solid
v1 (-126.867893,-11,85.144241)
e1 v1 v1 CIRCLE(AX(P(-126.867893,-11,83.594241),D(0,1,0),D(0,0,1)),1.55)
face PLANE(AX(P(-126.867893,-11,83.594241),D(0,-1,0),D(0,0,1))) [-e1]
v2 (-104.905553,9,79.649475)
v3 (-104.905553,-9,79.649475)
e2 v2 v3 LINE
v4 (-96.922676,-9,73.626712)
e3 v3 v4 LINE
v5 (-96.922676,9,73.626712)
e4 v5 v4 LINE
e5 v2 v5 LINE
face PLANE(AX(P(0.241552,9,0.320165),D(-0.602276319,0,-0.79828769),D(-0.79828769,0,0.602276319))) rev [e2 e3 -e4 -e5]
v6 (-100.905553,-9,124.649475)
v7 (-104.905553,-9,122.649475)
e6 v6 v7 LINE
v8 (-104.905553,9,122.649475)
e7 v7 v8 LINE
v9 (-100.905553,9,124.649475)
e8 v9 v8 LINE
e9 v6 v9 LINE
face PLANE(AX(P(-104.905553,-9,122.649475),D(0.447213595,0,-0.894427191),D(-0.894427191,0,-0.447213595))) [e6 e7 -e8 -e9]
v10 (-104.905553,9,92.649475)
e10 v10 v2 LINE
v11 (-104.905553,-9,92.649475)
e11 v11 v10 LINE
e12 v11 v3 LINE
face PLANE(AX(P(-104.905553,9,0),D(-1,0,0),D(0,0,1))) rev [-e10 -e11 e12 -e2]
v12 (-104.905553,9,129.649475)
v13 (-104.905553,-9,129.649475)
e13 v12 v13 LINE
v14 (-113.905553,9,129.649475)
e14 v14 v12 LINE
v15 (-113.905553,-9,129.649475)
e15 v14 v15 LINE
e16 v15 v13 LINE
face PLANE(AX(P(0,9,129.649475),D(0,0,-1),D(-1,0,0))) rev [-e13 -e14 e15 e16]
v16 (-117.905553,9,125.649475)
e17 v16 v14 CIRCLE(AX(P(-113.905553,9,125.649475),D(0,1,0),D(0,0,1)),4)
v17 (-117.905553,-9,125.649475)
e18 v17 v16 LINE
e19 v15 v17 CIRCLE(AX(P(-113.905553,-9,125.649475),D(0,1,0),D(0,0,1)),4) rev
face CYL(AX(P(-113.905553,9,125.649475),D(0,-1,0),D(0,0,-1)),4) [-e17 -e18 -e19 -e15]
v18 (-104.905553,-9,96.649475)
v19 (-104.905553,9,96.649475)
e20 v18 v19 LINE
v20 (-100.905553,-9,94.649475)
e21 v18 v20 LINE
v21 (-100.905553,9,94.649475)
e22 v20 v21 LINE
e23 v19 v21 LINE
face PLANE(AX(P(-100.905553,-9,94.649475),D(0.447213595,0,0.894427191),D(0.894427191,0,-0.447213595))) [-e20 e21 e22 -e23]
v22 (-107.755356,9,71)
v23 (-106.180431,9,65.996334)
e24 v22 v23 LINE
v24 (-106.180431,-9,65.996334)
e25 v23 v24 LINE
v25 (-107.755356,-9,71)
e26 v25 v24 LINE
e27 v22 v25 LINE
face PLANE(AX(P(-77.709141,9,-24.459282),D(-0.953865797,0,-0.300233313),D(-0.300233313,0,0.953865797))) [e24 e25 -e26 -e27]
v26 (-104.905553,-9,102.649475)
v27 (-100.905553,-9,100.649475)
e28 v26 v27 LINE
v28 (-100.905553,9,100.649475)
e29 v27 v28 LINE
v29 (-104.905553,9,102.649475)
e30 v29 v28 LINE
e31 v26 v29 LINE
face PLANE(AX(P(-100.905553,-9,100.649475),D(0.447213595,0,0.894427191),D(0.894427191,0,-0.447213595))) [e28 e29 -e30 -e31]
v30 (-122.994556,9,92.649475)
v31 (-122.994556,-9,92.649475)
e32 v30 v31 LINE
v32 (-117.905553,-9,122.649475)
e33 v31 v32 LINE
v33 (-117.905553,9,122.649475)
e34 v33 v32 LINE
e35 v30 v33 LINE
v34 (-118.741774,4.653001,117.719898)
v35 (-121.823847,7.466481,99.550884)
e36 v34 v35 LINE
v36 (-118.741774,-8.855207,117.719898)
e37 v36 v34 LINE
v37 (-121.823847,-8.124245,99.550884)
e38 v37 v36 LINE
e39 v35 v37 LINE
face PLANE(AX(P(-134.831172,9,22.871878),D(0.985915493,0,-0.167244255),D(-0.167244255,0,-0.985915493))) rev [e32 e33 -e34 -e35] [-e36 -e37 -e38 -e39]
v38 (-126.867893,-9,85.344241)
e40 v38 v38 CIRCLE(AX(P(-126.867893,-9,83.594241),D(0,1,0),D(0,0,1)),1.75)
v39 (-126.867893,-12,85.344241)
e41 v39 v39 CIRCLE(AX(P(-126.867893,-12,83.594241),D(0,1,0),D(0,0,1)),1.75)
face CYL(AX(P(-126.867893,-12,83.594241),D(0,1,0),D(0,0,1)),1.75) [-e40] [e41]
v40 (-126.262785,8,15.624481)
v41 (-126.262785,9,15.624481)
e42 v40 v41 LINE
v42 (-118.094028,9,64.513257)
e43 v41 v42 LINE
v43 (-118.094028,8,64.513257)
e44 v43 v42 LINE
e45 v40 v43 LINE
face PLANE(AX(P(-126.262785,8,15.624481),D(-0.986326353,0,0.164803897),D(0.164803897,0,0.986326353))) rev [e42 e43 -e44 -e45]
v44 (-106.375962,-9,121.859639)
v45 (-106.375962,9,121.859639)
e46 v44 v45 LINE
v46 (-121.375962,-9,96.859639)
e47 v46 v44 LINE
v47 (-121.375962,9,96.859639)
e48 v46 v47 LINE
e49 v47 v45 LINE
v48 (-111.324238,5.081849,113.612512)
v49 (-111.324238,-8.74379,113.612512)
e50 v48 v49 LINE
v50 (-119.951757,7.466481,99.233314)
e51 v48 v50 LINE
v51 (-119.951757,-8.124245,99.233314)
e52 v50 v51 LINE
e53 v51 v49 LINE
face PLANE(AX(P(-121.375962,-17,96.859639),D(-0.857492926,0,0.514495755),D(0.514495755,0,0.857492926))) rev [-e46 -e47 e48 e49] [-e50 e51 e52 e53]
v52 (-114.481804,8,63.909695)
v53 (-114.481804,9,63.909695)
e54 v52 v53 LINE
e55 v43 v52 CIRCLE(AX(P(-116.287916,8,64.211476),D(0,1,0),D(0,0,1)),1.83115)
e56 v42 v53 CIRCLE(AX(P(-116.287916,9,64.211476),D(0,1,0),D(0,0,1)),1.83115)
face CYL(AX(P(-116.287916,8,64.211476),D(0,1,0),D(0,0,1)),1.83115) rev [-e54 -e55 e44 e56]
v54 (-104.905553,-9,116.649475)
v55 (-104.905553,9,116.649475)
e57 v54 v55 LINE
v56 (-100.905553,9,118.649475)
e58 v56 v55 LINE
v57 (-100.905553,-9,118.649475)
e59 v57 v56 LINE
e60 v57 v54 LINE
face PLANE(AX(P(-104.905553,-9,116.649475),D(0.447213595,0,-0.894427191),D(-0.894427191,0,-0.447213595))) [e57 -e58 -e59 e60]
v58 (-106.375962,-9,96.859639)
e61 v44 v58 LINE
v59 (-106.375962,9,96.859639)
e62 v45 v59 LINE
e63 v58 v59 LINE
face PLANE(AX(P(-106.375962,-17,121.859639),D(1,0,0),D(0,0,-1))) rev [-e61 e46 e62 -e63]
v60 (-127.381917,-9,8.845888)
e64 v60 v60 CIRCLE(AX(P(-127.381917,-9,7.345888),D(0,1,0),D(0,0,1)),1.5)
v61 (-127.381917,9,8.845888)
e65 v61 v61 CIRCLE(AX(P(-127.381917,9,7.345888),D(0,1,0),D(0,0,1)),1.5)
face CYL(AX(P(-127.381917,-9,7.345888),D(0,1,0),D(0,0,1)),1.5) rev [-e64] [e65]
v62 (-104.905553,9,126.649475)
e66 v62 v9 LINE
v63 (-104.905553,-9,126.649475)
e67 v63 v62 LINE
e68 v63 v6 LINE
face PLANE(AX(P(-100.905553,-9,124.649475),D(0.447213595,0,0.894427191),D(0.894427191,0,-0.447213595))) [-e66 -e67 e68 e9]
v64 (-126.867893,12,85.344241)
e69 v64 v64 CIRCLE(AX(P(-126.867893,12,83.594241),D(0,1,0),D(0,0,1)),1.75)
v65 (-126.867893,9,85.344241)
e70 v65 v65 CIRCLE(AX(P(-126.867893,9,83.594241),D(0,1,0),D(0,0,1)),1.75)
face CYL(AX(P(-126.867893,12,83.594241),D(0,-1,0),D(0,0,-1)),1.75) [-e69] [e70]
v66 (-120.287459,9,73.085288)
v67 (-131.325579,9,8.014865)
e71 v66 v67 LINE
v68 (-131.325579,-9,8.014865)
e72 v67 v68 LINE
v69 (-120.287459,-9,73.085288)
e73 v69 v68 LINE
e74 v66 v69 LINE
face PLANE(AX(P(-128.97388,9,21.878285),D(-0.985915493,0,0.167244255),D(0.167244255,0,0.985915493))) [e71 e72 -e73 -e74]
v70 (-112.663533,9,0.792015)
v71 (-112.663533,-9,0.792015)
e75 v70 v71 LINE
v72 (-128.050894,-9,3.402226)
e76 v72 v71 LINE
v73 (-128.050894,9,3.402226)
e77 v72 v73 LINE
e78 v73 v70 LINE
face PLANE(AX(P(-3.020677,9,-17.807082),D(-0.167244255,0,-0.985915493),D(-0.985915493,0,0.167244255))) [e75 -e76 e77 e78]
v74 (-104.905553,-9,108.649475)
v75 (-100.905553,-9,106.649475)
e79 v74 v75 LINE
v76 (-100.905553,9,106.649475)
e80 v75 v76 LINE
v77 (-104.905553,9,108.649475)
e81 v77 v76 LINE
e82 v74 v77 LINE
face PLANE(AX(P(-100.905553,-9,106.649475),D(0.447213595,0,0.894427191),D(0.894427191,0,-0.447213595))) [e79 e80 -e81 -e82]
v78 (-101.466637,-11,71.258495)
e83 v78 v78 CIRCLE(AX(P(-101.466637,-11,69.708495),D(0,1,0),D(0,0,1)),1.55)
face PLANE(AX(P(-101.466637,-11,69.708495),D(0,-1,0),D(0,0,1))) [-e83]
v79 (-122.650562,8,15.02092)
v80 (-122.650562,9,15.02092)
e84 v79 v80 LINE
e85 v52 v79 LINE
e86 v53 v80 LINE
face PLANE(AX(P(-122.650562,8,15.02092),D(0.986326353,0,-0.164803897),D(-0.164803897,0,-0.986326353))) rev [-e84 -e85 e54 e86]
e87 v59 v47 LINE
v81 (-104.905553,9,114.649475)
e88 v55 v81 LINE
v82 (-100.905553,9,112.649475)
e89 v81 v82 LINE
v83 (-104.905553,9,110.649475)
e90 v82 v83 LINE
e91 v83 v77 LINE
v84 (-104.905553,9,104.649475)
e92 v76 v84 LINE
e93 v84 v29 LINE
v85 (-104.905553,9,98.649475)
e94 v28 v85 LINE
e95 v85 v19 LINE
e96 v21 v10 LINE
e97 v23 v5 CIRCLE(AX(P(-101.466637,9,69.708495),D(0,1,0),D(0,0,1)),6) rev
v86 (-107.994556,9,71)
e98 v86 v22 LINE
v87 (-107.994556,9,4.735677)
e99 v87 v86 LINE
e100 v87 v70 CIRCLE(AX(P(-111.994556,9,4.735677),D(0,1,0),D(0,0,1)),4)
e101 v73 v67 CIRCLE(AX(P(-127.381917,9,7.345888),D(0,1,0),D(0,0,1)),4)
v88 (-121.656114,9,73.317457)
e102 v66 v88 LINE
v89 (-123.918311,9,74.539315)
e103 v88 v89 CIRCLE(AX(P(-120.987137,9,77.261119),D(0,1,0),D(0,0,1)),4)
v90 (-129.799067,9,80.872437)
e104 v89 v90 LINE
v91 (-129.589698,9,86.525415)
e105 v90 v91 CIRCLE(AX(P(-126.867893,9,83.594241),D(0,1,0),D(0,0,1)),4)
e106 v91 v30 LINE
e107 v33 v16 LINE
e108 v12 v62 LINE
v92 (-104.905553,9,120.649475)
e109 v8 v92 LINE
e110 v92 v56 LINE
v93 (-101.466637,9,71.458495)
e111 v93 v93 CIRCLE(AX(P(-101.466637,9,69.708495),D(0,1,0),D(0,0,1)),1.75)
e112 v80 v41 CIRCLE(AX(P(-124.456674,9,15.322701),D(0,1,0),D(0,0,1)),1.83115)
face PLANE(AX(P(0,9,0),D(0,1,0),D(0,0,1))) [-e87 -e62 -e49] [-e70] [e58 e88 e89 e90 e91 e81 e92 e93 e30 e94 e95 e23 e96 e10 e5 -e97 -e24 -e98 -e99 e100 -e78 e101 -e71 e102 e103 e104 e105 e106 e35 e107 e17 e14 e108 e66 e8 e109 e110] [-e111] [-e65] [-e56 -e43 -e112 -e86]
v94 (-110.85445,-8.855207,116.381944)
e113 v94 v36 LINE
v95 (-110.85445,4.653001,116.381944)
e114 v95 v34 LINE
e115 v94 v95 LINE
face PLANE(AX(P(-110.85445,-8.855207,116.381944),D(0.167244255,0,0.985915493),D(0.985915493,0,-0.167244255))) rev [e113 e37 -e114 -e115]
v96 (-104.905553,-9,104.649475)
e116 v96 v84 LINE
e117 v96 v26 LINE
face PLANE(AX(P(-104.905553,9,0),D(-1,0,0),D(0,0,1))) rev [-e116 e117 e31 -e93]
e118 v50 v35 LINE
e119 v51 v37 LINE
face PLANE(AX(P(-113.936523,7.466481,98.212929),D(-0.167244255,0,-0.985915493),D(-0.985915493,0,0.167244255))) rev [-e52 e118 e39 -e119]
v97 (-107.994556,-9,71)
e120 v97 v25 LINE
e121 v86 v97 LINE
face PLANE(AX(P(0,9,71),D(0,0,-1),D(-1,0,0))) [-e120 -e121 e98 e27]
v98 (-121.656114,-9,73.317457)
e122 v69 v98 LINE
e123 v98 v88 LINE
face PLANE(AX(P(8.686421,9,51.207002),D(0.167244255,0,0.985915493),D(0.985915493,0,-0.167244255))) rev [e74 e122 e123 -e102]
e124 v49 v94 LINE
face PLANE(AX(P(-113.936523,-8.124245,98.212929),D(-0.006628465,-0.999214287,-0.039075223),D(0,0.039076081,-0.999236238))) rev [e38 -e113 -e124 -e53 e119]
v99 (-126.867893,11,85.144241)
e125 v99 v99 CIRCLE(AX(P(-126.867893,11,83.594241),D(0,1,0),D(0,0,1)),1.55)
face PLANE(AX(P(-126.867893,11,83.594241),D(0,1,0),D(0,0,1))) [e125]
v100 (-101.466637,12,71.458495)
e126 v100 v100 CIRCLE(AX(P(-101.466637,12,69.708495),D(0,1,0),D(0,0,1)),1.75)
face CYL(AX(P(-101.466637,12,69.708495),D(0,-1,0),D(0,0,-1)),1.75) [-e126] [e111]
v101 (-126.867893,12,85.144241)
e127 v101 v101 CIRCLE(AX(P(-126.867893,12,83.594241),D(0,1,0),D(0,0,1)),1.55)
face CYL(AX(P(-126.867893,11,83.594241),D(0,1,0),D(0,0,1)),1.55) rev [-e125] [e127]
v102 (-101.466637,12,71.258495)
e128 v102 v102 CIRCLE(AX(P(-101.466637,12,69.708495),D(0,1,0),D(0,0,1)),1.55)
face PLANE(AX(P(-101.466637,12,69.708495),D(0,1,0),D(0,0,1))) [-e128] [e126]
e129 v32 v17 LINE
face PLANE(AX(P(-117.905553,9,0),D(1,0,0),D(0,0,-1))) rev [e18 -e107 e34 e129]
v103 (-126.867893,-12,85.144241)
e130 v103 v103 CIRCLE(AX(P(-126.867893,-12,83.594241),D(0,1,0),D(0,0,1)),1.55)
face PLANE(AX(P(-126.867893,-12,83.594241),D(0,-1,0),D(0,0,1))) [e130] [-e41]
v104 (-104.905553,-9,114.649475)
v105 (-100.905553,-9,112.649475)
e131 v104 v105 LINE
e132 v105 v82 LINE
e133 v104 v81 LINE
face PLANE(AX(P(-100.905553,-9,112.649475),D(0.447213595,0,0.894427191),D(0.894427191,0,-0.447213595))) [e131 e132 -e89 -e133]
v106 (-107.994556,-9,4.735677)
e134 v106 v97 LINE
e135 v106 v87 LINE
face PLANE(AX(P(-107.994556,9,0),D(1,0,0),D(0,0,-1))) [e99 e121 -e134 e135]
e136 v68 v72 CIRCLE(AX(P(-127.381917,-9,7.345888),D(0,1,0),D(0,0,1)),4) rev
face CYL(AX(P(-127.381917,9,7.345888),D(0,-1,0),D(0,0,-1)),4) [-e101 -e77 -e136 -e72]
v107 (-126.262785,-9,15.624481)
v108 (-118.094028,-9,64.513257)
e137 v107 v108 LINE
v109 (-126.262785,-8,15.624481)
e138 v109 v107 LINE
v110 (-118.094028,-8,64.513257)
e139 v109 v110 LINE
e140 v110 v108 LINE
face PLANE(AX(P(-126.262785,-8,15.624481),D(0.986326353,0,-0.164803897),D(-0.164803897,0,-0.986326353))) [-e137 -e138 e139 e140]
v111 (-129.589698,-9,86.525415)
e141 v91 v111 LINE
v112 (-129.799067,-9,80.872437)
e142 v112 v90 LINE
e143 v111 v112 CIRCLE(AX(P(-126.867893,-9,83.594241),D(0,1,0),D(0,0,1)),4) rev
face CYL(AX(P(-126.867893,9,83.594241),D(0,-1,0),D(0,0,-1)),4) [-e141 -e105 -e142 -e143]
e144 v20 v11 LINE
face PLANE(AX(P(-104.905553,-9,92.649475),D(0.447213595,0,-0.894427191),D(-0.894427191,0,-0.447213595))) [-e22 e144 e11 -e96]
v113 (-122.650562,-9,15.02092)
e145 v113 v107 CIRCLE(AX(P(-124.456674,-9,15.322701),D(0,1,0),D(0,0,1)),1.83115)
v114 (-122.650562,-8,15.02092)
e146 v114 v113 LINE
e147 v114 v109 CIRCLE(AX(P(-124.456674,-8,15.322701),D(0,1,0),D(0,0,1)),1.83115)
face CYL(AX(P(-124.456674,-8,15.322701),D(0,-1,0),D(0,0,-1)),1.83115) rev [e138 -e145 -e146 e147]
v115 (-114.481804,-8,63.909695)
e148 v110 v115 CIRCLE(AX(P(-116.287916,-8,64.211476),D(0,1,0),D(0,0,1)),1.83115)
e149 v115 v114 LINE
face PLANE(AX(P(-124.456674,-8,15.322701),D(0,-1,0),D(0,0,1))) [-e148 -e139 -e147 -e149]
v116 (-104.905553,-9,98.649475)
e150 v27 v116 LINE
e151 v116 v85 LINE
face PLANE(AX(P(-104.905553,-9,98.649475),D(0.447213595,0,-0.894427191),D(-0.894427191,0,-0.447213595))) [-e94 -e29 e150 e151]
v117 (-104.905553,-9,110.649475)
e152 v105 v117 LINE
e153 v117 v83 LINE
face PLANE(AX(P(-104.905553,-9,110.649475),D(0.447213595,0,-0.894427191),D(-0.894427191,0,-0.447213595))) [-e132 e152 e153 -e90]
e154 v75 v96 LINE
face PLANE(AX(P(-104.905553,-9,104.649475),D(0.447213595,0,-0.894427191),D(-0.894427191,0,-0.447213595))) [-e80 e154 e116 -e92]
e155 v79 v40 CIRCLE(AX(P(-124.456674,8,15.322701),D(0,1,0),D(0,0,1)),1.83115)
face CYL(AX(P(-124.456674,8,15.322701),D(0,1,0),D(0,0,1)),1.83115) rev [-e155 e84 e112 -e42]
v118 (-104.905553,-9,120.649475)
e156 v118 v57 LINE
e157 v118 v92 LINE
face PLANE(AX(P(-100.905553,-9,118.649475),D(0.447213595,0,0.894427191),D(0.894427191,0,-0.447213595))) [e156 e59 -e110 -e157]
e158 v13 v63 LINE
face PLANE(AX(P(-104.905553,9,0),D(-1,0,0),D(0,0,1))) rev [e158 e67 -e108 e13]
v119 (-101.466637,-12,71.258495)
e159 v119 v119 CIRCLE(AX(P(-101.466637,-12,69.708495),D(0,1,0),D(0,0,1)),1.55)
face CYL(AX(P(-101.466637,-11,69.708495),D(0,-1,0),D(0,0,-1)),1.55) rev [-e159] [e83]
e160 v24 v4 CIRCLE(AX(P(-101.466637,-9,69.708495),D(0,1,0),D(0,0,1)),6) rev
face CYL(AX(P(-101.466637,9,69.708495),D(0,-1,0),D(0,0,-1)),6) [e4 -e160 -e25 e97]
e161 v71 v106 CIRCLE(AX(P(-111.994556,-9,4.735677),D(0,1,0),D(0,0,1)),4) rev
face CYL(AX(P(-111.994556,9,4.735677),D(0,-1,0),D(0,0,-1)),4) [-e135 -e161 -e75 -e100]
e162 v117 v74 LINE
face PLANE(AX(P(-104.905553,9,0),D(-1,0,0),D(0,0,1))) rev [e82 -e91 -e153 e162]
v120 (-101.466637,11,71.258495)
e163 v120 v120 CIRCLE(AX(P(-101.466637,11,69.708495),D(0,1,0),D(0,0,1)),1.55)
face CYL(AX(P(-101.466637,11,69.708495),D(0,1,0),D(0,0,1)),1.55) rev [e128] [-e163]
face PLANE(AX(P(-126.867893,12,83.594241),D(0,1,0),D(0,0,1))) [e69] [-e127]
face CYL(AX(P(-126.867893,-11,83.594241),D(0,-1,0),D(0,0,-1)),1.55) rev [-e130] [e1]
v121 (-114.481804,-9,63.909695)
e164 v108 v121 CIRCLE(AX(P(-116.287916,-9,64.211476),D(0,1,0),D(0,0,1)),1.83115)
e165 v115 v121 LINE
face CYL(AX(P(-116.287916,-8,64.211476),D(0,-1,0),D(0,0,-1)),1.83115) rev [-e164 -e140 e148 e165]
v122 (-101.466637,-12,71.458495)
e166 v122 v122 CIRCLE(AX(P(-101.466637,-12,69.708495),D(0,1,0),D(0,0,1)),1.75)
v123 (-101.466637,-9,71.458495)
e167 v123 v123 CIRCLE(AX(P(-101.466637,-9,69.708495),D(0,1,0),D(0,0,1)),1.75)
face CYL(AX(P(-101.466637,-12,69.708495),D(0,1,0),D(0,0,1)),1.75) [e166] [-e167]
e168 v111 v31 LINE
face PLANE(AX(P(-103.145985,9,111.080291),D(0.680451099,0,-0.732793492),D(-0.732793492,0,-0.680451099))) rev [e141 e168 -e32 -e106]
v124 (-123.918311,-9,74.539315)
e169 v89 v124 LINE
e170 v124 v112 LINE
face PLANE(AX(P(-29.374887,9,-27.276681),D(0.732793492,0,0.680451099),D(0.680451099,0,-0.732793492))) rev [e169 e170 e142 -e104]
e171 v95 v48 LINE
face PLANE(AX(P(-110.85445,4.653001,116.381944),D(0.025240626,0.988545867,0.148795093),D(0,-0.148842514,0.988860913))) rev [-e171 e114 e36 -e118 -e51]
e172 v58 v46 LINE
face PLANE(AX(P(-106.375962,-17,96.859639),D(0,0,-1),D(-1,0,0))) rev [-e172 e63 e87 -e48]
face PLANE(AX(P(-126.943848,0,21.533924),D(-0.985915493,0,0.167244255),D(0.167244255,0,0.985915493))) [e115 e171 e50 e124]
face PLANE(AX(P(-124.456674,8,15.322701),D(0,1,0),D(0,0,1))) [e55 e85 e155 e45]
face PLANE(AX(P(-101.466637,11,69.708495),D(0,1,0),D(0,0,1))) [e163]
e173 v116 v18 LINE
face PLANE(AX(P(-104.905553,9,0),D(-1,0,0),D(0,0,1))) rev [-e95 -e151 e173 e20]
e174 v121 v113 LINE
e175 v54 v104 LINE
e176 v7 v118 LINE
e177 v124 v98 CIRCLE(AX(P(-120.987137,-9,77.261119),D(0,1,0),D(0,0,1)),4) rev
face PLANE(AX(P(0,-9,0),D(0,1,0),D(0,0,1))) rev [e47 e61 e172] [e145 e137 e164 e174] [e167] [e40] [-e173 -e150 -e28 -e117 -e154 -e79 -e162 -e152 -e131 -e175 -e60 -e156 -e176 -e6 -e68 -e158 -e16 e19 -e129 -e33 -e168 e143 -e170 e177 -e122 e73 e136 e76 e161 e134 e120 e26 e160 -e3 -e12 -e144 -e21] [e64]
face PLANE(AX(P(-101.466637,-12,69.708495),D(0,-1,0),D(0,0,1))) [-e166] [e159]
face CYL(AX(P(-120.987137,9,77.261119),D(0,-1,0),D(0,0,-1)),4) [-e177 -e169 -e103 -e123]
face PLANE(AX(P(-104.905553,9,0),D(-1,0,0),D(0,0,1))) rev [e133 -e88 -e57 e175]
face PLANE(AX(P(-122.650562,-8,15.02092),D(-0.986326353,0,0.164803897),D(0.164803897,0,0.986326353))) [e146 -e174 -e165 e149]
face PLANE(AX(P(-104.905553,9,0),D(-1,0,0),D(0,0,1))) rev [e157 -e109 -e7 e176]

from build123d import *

# Parameters (mm, degrees)
BOSS_EXTRUDE2_DEPTH   = 9
FILLET3_R             = 4
FILLET4_R             = 4
FILLET5_R             = 4
BOSS_EXTRUDE3_DEPTH   = 18
LPATTERN1_COUNT       = 6
LPATTERN1_PITCH       = 6
MIRROR1_START         = -8.124245185
MIRROR1_OUTLINE_R     = 1.5
MIRROR1_DEPTH         = 12.777246129
MIRROR1_START_2       = -9
MIRROR1_2_OUTLINE_R   = 1.5
MIRROR1_2_DEPTH       = 18
MIRROR1_3_DEPTH       = 1
MIRROR1_START_3       = 8
MIRROR1_4_DEPTH       = 1
MIRROR1_START_4       = -11
MIRROR1_5_OUTLINE_R   = 1.75
MIRROR1_5_DEPTH       = 22
MIRROR1_START_5       = -12
MIRROR1_6_OUTLINE_R   = 1.75
MIRROR1_6_OUTLINE_R_2 = 1.55
MIRROR1_6_DEPTH       = 24
MIRROR1_START_6       = -136.757331166
MIRROR1_7_DEPTH       = 7.999999999


with BuildPart() as part:
    # Sketch2 → Boss-Extrude2 (new, symmetric)
    with BuildSketch(Plane(origin=(0, 0, 0), x_dir=(1, 0, 0), z_dir=(0, 1, 0))):
        Polygon((-131.994556455, -4.071203001), (-120.287458623, -73.085287508), (-107.994556455, -71), (-107.994556455, 0), align=None)
        with BuildLine():
            ThreePointArc((-106.180430892, -65.996333846), (-97.650502603, -65.078471315), (-96.922675808, -73.626711859))
            Line((-96.922675808, -73.626711859), (-104.905552704, -79.64947505))
            Line((-104.905552704, -79.64947505), (-104.905552704, -129.64947505))
            Line((-104.905552704, -129.64947505), (-117.905552704, -129.64947505))
            Line((-117.905552704, -129.64947505), (-117.905552704, -122.64947505))
            Line((-117.905552704, -122.64947505), (-122.994556455, -92.64947505))
            Line((-122.994556455, -92.64947505), (-132.520871847, -83.803610759))
            Line((-132.520871847, -83.803610759), (-122.994556455, -73.544501876))
            Line((-122.994556455, -73.544501876), (-107.994556455, -71))
            Line((-107.994556455, -71), (-107.755356075, -71))
            Line((-107.755356075, -71), (-106.180430892, -65.996333846))
        make_face()
    extrude(amount=BOSS_EXTRUDE2_DEPTH, both=True)

    # Fillet3
    fillet3_edges = [part.edges().sort_by_distance(p)[0] for p in [
        (-131.994556455, 0, 4.071203001),
        (-107.994556455, 0, 0),
    ]]
    fillet(fillet3_edges, radius=FILLET3_R)

    # Fillet4
    fillet4_edges = [part.edges().sort_by_distance(p)[0] for p in [
        (-132.520871847, 0, 83.803610759),
        (-122.994556455, 0, 73.544501876),
    ]]
    fillet(fillet4_edges, radius=FILLET4_R)

    # Fillet5
    fillet5_edges = [part.edges().sort_by_distance(p)[0] for p in [
        (-117.905552704, 0, 129.64947505),
    ]]
    fillet(fillet5_edges, radius=FILLET5_R)

    # Sketch4 → Boss-Extrude3 (add)
    with BuildSketch(Plane(origin=(0, 9, 0), x_dir=(1, 0, 0), z_dir=(0, 1, 0))):
        Polygon((-104.905552704, -126.64947505), (-104.905552704, -122.64947505), (-100.905552704, -124.64947505), align=None)
    boss_extrude3 = extrude(amount=-BOSS_EXTRUDE3_DEPTH)

    # LPattern1: Boss-Extrude3 ×6
    with Locations(*[(0, 0, -i * LPATTERN1_PITCH) for i in range(1, LPATTERN1_COUNT)]):
        add(boss_extrude3)

    # Mirror1: read off the stored shape, not the designer's step
    # Mirror1 outline → Mirror1 (cut)
    with BuildSketch(Plane(origin=(0, 0, 0), x_dir=(1, 0, 0), z_dir=(0, 1, 0)).offset(MIRROR1_START)):
        Polygon((-106.375961974, -96.859639276), (-121.375961974, -96.859639276), (-119.951756879, -99.233314435), (-121.823846672, -99.550883501), (-118.741773978, -117.719897586), (-110.854450034, -116.381943548), (-111.324238264, -113.612512127), (-106.375961974, -121.859639276), align=None)
        with Locations((-127.381917465, -7.345887954)):
            Circle(MIRROR1_OUTLINE_R)
    extrude(amount=MIRROR1_DEPTH, mode=Mode.SUBTRACT)

    # Mirror1 2 outline → Mirror1 2 (cut)
    with BuildSketch(Plane(origin=(0, 0, 0), x_dir=(1, 0, 0), z_dir=(0, 1, 0)).offset(MIRROR1_START_2)):
        Polygon((-106.375961974, -96.859639276), (-121.375961974, -96.859639276), (-106.375961974, -121.859639276), align=None)
        with Locations((-127.381917465, -7.345887954)):
            Circle(MIRROR1_2_OUTLINE_R)
    extrude(amount=MIRROR1_2_DEPTH, mode=Mode.SUBTRACT)

    # Mirror1 3 outline → Mirror1 3 (cut)
    with BuildSketch(Plane(origin=(0, 0, 0), x_dir=(1, 0, 0), z_dir=(0, 1, 0)).offset(MIRROR1_START_2)):
        with BuildLine():
            Line((-114.481804476, -63.909695389), (-122.650561904, -15.020919875))
            ThreePointArc((-122.650561904, -15.020919875), (-124.758454252, -13.516588893), (-126.262785233, -15.624481241))
            Line((-126.262785233, -15.624481241), (-118.094027806, -64.513256756))
            ThreePointArc((-118.094027806, -64.513256756), (-115.986135457, -66.017587738), (-114.481804476, -63.909695389))
        make_face()
    extrude(amount=MIRROR1_3_DEPTH, mode=Mode.SUBTRACT)

    # Mirror1 4 outline → Mirror1 4 (cut)
    with BuildSketch(Plane(origin=(0, 0, 0), x_dir=(1, 0, 0), z_dir=(0, 1, 0)).offset(MIRROR1_START_3)):
        with BuildLine():
            Line((-114.481804476, -63.909695389), (-122.650561904, -15.020919875))
            ThreePointArc((-122.650561904, -15.020919875), (-124.758454252, -13.516588893), (-126.262785233, -15.624481241))
            Line((-126.262785233, -15.624481241), (-118.094027806, -64.513256756))
            ThreePointArc((-118.094027806, -64.513256756), (-115.986135457, -66.017587738), (-114.481804476, -63.909695389))
        make_face()
    extrude(amount=MIRROR1_4_DEPTH, mode=Mode.SUBTRACT)

    # Mirror1 5 outline → Mirror1 5 (add)
    with BuildSketch(Plane(origin=(0, 0, 0), x_dir=(1, 0, 0), z_dir=(0, 1, 0)).offset(MIRROR1_START_4)):
        with Locations((-126.867893483, -83.59424119)):
            Circle(MIRROR1_5_OUTLINE_R)
        with Locations((-101.466636513, -69.708495286)):
            Circle(MIRROR1_5_OUTLINE_R)
    extrude(amount=MIRROR1_5_DEPTH)

    # Mirror1 6 outline → Mirror1 6 (add)
    # profile 1 of 2: a face of its own
    with BuildSketch(Plane(origin=(0, 0, 0), x_dir=(1, 0, 0), z_dir=(0, 1, 0)).offset(MIRROR1_START_5)):
        with Locations((-126.867893483, -83.59424119)):
            Circle(MIRROR1_6_OUTLINE_R)
        with Locations((-126.867893483, -83.59424119)):
            Circle(MIRROR1_6_OUTLINE_R_2, mode=Mode.SUBTRACT)
    # profile 2 of 2: a face of its own
    with BuildSketch(Plane(origin=(0, 0, 0), x_dir=(1, 0, 0), z_dir=(0, 1, 0)).offset(MIRROR1_START_5)):
        with Locations((-101.466636513, -69.708495286)):
            Circle(MIRROR1_6_OUTLINE_R)
        with Locations((-101.466636513, -69.708495286)):
            Circle(MIRROR1_6_OUTLINE_R_2, mode=Mode.SUBTRACT)
    extrude(amount=MIRROR1_6_DEPTH)

    # Mirror1 7 outline → Mirror1 7 (cut)
    with BuildSketch(Plane(origin=(0, 0, 0), x_dir=(0, 1, 0), z_dir=(0.9859154929577465, 0, -0.1672442547470129)).offset(MIRROR1_START_6)):
        Polygon((4.653000944, 77.774419934), (7.4664805, 77.774419934), (4.653000944, 96.202991363), align=None)
        Polygon((-8.124245185, 77.774419934), (-8.124245185, 96.202991363), (-8.855207199, 96.202991363), align=None)
    extrude(amount=MIRROR1_7_DEPTH, mode=Mode.SUBTRACT)


solid = part.part
